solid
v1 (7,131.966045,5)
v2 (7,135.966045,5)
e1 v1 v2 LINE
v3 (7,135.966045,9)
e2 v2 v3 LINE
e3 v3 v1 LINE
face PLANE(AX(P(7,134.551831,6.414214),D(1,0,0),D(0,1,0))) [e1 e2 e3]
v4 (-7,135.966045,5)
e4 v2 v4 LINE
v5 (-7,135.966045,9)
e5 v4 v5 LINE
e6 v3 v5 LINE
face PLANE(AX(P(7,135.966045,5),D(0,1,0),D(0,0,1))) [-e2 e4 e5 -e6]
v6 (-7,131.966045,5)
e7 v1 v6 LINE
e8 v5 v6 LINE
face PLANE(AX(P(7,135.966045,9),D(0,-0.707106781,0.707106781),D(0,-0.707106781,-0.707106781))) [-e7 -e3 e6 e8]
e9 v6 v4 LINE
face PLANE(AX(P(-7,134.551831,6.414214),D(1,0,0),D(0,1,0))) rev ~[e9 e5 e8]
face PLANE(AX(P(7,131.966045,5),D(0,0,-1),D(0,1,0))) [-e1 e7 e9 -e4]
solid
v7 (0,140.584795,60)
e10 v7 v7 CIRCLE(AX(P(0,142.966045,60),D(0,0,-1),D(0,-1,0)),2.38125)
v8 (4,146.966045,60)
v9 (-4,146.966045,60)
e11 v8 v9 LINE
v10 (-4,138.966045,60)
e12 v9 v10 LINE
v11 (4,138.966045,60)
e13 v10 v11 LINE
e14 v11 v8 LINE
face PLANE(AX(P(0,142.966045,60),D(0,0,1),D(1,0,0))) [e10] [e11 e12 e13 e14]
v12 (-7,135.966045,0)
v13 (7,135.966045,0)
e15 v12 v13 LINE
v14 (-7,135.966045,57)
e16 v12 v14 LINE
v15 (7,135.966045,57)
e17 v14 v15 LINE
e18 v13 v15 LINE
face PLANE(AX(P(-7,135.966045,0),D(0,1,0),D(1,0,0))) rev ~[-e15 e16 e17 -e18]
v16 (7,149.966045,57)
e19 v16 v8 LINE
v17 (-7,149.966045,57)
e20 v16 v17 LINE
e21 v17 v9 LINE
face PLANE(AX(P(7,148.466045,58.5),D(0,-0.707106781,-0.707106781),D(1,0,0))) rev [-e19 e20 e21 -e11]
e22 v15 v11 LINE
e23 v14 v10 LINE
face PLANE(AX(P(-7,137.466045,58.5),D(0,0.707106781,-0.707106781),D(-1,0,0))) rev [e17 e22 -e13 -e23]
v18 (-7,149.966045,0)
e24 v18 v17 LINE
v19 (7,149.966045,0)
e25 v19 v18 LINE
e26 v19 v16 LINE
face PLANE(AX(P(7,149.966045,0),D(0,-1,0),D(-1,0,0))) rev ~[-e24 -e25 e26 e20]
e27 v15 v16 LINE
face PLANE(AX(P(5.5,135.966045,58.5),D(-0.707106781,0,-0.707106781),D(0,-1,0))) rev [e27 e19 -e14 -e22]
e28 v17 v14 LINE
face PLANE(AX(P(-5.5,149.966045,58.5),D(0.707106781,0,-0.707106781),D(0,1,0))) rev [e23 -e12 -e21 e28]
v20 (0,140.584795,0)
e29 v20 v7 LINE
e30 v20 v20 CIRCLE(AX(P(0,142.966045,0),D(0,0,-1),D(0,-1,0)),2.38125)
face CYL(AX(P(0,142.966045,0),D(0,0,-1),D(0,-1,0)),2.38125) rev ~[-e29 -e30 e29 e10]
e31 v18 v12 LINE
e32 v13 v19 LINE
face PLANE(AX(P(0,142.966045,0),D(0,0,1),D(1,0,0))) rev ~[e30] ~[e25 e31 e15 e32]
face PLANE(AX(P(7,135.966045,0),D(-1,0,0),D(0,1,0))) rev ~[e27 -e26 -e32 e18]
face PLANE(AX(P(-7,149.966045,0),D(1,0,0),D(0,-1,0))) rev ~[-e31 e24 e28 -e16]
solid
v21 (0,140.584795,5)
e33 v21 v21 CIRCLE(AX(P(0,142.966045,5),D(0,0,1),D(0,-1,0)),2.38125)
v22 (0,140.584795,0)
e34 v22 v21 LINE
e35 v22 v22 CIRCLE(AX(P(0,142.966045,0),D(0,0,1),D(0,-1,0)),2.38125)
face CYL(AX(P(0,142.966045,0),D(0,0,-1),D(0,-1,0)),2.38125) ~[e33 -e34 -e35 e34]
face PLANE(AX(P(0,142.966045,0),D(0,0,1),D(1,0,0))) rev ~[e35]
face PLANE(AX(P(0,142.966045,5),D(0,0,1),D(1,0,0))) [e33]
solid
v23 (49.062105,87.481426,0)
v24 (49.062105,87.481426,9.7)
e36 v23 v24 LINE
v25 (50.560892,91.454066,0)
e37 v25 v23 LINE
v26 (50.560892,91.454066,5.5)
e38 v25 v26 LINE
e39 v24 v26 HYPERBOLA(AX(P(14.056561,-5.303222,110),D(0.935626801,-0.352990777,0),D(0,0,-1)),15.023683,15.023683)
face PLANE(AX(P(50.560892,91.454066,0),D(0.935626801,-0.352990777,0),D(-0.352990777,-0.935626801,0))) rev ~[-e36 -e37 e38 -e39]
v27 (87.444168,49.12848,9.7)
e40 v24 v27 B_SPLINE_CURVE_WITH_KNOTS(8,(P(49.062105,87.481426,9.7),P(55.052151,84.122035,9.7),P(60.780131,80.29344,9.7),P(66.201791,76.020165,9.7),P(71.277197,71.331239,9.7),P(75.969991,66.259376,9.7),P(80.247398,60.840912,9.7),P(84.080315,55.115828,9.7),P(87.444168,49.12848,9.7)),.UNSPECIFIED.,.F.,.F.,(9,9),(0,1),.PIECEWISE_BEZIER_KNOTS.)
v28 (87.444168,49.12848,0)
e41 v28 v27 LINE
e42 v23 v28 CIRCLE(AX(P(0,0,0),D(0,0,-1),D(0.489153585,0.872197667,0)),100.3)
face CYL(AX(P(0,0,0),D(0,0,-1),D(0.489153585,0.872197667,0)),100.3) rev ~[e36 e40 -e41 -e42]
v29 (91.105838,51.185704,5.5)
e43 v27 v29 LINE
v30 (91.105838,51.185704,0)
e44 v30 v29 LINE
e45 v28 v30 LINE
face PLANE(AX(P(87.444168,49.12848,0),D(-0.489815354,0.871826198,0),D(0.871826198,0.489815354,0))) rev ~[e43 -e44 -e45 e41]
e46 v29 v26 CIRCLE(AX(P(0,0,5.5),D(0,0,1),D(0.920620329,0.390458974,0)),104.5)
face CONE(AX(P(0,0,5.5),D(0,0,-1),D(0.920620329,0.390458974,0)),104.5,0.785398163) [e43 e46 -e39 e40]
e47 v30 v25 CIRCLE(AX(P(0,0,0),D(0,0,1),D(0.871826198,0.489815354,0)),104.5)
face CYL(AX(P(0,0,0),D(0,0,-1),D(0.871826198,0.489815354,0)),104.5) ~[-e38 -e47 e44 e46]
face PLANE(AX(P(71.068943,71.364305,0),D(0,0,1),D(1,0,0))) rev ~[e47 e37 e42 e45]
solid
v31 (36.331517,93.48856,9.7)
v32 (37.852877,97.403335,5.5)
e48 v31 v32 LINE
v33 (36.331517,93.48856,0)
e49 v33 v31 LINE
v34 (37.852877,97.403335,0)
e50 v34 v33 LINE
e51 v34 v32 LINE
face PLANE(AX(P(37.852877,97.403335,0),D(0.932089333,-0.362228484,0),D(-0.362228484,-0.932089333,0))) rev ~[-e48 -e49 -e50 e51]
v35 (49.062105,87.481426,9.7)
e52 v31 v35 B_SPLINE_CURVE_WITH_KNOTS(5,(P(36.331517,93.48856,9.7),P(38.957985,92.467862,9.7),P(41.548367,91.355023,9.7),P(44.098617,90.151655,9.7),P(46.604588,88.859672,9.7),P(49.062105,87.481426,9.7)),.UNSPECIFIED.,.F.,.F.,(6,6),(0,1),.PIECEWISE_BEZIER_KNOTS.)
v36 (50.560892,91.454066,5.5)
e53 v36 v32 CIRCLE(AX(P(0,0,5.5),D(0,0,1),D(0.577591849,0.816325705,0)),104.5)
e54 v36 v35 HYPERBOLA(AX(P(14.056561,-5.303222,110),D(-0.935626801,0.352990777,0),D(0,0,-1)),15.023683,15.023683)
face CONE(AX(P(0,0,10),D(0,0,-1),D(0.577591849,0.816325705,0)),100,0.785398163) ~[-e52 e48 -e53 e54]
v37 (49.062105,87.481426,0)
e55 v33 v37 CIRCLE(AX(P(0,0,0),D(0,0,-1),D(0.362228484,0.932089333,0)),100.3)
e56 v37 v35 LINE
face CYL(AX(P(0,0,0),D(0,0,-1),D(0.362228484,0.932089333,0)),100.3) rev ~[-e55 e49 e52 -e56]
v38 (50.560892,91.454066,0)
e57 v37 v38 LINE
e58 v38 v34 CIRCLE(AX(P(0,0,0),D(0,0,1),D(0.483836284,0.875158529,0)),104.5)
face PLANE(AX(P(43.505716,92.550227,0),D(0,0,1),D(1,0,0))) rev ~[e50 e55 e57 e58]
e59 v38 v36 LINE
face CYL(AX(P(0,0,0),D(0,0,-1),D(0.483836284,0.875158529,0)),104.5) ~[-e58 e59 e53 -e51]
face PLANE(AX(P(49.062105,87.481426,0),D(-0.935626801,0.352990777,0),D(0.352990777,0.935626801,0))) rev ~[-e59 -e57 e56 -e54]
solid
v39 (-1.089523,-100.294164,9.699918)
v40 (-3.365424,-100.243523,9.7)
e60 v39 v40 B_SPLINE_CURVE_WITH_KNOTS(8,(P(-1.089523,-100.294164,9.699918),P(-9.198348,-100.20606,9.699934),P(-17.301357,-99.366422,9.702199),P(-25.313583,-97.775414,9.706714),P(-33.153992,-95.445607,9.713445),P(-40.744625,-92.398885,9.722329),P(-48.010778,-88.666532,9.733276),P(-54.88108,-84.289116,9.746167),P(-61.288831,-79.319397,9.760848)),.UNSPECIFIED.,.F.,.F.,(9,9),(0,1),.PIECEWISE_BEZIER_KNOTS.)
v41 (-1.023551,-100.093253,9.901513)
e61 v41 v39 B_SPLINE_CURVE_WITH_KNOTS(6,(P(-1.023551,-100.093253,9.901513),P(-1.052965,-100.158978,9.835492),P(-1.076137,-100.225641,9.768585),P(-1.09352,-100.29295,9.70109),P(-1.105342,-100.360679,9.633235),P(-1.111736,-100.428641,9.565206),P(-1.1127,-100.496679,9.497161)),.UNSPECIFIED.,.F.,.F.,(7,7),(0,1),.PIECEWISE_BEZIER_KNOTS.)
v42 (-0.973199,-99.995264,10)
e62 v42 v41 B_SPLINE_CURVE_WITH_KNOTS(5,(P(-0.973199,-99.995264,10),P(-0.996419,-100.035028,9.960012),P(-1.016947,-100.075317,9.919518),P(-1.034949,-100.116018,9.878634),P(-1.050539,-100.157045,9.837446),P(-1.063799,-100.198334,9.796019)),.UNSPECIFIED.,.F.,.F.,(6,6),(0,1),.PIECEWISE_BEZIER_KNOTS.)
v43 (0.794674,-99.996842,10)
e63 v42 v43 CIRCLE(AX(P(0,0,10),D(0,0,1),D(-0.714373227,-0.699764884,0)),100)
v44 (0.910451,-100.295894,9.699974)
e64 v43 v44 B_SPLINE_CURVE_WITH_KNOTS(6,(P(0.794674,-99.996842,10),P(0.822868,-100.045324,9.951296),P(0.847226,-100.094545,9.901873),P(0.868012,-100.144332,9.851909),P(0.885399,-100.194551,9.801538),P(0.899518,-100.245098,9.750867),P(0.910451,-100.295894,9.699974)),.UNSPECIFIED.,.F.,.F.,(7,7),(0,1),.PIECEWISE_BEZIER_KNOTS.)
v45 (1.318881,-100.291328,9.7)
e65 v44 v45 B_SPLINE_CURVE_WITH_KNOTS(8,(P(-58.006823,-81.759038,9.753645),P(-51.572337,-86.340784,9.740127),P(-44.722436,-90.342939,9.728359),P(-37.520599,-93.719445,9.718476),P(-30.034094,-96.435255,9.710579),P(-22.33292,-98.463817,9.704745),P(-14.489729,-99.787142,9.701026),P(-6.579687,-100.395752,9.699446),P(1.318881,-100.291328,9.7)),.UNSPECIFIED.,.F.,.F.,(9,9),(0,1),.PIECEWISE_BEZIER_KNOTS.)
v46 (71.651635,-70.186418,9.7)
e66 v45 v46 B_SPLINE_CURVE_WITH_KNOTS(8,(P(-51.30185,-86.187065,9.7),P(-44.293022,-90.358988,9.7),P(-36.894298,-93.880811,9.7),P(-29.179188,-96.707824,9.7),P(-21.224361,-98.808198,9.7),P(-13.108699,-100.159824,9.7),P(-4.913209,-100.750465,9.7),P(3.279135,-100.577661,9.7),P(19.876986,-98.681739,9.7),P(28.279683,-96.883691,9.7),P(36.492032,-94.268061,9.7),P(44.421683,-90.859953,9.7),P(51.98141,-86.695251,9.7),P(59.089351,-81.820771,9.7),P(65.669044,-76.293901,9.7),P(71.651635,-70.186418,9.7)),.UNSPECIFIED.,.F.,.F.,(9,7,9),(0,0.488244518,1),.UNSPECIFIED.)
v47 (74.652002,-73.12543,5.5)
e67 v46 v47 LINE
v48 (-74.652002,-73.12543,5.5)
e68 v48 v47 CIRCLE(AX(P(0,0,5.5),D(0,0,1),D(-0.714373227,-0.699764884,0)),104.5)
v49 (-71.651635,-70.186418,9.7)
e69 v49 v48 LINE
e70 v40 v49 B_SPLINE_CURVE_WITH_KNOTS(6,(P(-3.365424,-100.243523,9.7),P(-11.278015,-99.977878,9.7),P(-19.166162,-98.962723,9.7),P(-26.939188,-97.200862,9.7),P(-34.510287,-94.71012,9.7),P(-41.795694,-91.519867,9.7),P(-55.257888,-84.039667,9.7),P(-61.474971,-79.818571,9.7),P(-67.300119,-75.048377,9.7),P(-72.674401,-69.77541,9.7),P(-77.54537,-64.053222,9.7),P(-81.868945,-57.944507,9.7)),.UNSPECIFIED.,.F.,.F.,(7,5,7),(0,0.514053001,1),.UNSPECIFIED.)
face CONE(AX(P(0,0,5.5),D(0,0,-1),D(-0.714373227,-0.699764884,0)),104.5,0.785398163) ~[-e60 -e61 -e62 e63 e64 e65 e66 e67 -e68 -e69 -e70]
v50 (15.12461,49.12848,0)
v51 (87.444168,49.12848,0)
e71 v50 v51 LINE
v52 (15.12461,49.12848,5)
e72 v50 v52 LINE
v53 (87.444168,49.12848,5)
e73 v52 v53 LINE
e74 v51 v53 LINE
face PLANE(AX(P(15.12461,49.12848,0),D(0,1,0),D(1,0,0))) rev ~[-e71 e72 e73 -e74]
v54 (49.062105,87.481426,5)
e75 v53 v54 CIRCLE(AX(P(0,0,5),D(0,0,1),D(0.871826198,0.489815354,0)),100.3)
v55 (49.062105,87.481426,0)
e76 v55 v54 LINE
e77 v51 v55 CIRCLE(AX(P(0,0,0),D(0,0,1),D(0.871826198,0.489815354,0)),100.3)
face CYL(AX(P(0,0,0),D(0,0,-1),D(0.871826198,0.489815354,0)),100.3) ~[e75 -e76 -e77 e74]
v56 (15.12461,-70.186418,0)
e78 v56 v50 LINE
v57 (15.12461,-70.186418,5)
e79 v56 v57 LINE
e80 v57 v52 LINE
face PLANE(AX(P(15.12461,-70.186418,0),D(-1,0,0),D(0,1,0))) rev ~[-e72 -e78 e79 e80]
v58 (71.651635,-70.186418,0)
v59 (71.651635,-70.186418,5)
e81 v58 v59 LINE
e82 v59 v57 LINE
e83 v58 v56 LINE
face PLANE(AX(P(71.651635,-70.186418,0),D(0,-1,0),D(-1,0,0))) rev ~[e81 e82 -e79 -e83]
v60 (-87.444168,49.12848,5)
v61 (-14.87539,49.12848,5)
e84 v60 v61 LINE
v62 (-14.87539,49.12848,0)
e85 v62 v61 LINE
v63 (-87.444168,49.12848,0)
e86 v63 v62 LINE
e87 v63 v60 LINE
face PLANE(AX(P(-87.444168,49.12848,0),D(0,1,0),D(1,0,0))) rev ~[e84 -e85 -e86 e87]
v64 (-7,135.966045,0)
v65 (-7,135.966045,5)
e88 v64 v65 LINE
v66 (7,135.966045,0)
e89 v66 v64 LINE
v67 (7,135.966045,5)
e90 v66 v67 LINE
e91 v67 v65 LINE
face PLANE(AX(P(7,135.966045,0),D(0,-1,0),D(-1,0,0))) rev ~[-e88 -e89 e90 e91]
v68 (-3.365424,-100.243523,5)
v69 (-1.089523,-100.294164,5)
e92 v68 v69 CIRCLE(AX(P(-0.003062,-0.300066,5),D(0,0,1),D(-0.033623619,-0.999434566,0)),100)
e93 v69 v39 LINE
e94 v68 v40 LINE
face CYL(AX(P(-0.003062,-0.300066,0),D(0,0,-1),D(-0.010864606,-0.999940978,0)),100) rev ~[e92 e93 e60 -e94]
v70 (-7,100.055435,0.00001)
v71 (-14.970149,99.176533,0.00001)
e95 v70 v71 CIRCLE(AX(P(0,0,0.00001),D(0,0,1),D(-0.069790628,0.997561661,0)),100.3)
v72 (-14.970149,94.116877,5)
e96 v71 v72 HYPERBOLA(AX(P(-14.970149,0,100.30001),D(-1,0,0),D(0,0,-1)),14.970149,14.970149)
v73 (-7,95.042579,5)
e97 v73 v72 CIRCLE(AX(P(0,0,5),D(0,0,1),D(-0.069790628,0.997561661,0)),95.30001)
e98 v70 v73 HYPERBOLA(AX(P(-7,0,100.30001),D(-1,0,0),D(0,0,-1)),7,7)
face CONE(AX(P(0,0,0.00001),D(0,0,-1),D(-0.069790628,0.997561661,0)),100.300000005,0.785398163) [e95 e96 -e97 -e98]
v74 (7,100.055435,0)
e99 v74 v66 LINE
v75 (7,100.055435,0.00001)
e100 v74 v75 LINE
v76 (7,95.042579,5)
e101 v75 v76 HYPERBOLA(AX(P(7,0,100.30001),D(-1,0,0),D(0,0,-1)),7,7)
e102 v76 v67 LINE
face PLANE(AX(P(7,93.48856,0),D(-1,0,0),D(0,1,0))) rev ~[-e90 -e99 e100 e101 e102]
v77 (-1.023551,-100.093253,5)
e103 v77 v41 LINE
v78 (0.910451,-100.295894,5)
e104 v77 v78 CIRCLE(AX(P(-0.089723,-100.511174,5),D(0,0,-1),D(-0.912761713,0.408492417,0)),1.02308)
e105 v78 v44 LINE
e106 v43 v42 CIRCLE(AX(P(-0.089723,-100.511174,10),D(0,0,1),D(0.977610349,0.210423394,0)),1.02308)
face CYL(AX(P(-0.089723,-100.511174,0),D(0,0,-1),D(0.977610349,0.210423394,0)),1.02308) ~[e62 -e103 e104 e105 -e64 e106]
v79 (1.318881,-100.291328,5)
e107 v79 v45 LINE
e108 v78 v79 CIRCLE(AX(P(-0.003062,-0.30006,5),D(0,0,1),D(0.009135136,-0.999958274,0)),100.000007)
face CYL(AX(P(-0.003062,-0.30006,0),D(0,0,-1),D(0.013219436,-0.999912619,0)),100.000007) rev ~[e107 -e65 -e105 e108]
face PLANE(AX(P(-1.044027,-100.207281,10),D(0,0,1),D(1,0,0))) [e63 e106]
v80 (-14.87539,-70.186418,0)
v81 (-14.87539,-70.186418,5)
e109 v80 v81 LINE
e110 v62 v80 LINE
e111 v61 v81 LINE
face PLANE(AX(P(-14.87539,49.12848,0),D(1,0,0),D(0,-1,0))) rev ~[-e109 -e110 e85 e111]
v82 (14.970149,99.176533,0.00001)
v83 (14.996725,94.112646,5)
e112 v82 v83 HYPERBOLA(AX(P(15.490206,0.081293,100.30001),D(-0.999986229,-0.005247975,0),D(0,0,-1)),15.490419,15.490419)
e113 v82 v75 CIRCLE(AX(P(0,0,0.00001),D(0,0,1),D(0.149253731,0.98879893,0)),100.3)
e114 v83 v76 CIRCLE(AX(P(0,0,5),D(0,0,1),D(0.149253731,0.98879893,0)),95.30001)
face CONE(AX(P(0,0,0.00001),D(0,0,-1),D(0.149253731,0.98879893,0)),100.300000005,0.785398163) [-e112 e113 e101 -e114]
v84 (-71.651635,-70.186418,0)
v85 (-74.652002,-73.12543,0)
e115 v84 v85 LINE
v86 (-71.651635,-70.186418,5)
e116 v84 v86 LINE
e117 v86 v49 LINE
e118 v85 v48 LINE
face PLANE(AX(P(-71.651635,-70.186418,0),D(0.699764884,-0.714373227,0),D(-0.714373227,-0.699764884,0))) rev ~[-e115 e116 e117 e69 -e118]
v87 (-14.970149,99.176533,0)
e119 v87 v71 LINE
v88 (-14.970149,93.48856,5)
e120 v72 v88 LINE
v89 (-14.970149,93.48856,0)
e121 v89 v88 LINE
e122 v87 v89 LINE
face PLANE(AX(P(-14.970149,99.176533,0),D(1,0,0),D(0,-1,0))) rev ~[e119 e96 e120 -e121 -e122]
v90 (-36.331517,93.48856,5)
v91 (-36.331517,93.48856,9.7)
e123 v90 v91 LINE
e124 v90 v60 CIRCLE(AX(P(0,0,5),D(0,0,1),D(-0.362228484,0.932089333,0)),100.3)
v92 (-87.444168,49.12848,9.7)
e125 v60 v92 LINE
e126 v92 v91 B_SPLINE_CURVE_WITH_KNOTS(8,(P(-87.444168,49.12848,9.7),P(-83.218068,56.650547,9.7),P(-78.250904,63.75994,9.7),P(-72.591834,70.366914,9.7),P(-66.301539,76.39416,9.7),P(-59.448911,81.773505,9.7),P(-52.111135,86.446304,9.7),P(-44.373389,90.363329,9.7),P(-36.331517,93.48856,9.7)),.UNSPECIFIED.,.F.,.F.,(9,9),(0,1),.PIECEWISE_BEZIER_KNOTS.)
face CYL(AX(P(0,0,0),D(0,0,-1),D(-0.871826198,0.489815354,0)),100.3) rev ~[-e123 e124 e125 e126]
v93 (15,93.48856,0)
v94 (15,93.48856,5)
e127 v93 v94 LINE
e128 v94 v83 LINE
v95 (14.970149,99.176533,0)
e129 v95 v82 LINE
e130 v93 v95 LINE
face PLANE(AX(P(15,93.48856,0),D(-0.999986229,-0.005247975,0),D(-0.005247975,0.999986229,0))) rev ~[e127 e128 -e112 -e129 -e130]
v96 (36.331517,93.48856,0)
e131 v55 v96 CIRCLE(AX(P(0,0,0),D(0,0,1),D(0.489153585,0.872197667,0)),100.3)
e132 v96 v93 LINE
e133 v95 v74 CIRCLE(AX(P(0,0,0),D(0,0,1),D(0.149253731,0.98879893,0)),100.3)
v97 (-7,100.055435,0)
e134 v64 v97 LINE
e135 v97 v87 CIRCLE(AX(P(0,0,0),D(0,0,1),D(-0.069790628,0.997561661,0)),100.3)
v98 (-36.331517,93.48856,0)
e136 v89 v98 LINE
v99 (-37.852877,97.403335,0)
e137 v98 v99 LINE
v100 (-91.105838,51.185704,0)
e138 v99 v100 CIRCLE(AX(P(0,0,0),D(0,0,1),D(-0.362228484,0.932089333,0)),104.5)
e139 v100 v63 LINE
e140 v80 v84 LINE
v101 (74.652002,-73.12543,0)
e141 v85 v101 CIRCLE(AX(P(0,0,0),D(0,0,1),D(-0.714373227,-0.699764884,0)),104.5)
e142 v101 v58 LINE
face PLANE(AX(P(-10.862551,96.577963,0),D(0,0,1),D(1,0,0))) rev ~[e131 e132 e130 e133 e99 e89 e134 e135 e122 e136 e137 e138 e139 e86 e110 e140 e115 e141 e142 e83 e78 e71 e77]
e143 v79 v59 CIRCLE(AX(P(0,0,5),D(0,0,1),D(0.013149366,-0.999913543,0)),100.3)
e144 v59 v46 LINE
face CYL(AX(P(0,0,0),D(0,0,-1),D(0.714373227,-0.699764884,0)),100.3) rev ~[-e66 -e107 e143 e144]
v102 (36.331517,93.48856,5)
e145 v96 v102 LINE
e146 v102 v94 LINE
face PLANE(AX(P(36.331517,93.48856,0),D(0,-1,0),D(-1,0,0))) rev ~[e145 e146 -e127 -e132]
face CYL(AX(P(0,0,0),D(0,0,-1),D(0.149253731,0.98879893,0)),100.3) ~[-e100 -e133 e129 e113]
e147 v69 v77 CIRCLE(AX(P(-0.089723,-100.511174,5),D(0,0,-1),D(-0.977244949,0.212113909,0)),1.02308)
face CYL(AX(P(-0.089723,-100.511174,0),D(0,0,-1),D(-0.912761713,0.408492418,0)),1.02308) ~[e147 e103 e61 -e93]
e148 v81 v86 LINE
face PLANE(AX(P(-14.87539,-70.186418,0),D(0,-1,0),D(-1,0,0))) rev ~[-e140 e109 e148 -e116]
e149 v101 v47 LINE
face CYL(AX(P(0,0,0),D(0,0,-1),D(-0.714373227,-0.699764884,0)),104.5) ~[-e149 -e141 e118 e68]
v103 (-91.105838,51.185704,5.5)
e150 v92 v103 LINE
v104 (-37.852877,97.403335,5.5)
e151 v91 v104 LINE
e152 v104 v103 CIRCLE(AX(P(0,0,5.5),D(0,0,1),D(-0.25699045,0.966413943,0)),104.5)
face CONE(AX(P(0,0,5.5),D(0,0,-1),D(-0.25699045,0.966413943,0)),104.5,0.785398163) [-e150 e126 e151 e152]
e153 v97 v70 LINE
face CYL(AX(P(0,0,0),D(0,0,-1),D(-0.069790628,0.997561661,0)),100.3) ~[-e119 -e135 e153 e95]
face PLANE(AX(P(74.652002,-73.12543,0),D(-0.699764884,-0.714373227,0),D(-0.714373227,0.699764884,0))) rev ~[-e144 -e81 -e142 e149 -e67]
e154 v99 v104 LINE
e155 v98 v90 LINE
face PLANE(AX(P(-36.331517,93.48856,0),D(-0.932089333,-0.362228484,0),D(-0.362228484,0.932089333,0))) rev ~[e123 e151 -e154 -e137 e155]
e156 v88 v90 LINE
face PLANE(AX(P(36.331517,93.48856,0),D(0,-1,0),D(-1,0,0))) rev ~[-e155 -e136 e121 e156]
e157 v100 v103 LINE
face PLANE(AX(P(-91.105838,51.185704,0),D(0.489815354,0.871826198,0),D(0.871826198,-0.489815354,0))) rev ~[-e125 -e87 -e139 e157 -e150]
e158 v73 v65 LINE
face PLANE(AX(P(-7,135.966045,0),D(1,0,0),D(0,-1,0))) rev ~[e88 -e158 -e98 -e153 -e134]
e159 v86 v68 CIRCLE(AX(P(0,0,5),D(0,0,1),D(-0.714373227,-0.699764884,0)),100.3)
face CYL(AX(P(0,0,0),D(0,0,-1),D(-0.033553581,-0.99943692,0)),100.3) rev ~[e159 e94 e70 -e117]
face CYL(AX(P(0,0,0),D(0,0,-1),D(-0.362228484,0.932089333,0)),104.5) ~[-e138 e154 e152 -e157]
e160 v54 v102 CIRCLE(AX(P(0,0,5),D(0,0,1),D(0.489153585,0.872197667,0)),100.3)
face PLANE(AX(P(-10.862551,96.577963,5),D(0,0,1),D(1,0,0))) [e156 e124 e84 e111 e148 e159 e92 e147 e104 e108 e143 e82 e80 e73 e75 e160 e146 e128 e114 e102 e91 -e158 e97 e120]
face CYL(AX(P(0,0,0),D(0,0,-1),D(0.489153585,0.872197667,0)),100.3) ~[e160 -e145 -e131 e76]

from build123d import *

# Parameters (mm, degrees)
F1_DEPTH     = 5
F2_DEPTH     = 10
F3_DEPTH     = 10
F4_SIZE      = 4.5
F5_T2_ANGLE  = 52.1255505296
F6_DEPTH     = 10
F7_DEPTH     = 10
F8_T2_ANGLE  = 44.4260668477
F9_DEPTH     = 5
F10_DEPTH    = 5
F11_DEPTH    = 5
F12_DEPTH    = 60
F13_T2_ANGLE = 20.3893123961
F14_SIZE     = 4.99999
F15_SIZE     = 4.99999
F16_SIZE     = 3
F18_DEPTH    = 14


# Not quite as in the source:
# - a fillet or chamfer that OpenCascade refuses, or shapes differently, is made with other operations: its cross-section is extruded or revolved along the edge and cut away or added
# - a fillet or chamfer is up to 0.001 mm smaller than in the source, because OpenCascade refuses the exact size


with BuildPart() as f1:
    # F0 (on Top) → F1 (new body)
    with BuildSketch(Plane.XY):
        with BuildLine():
            Line((15.124610185, 49.1284800026), (87.4441676307, 49.1284800026))
            ThreePointArc((87.4441676307, 49.1284800026), (70.8958934178, 70.9497166767), (49.0621045575, 87.481426008))
            ThreePointArc((49.0621045575, 87.481426008), (42.8023254488, 90.7086045322), (36.3315169542, 93.4885601333))
            Line((36.3315169542, 93.4885601333), (15, 93.4885601333))
            Line((15, 93.4885601333), (7, 93.4885601333))
            Line((7, 93.4885601333), (0, 93.4885601333))
            Line((0, 93.4885601333), (-7, 93.4885601333))
            Line((-7, 93.4885601333), (-14.9701492537, 93.4885601333))
            Line((-14.9701492537, 93.4885601333), (-36.3315169542, 93.4885601333))
            ThreePointArc((-36.3315169542, 93.4885601333), (-65.7423699065, 75.7497907527), (-87.4441676307, 49.1284800026))
            Line((-87.4441676307, 49.1284800026), (-14.875389815, 49.1284800026))
            Line((-14.875389815, 49.1284800026), (-14.875389815, -70.1864178667))
            Line((-14.875389815, -70.1864178667), (-71.6516346432, -70.1864178667))
            ThreePointArc((-71.6516346432, -70.1864178667), (-40.4072663325, -91.8005600611), (-3.3654241895, -100.2435230827))
            ThreePointArc((-3.3654241895, -100.2435230827), (-2.227617662, -100.2753201611), (-1.0895229177, -100.2941642982))
            ThreePointArc((-1.0895229177, -100.2941642982), (-1.0617419835, -100.1919997221), (-1.0235513801, -100.0932532857))
            ThreePointArc((-1.0235513801, -100.0932532857), (0.0168897899, -99.4936635029), (0.9104513343, -100.2958938327))
            ThreePointArc((0.9104513343, -100.2958938327), (1.1146686841, -100.2938196477), (1.318881372, -100.2913283985))
            ThreePointArc((1.318881372, -100.2913283985), (39.4683475891, -92.2081316294), (71.6516346432, -70.1864178667))
            Line((71.6516346432, -70.1864178667), (15.124610185, -70.1864178667))
            Line((15.124610185, -70.1864178667), (15.124610185, 49.1284800026))
        make_face()
    extrude(amount=F1_DEPTH)

    # F0 (on Top) → F2 (join)
    with BuildSketch(Plane.XY):
        with BuildLine():
            ThreePointArc((-87.4441676307, 49.1284800026), (-65.7423699065, 75.7497907527), (-36.3315169542, 93.4885601333))
            Line((-36.3315169542, 93.4885601333), (-37.8528765874, 97.4033353333))
            ThreePointArc((-37.8528765874, 97.4033353333), (-68.4952906802, 78.9217660385), (-91.1058376611, 51.1857044893))
            Line((-91.1058376611, 51.1857044893), (-87.4441676307, 49.1284800026))
        make_face()
        with BuildLine():
            Line((74.6520021956, -73.1254303795), (71.6516346432, -70.1864178667))
            ThreePointArc((71.6516346432, -70.1864178667), (39.4683475891, -92.2081316294), (1.318881372, -100.2913283985))
            ThreePointArc((1.318881372, -100.2913283985), (1.1146686841, -100.2938196477), (0.9104513343, -100.2958938327))
            ThreePointArc((0.9104513343, -100.2958938327), (-0.0565525239, -100.3000521496), (-1.0235513801, -100.2948593303))
            ThreePointArc((-1.0235513801, -100.2948593303), (-1.0565372062, -100.2945172548), (-1.0895229177, -100.2941642982))
            ThreePointArc((-1.0895229177, -100.2941642982), (-2.227617662, -100.2753201611), (-3.3654241895, -100.2435230827))
            ThreePointArc((-3.3654241895, -100.2435230827), (-40.4072663325, -91.8005600611), (-71.6516346432, -70.1864178667))
            Line((-71.6516346432, -70.1864178667), (-74.6520021956, -73.1254303795))
            ThreePointArc((-74.6520021956, -73.1254303795), (0, -104.5), (74.6520021956, -73.1254303795))
        make_face()
    extrude(amount=F2_DEPTH)

    # F0 (on Top) → F3 (join)
    with BuildSketch(Plane.XY):
        with BuildLine():
            ThreePointArc((-1.0895229177, -100.2941642982), (-1.0565372062, -100.2945172548), (-1.0235513801, -100.2948593303))
            Line((-1.0235513801, -100.2948593303), (-1.0235513801, -100.0932532857))
            ThreePointArc((-1.0235513801, -100.0932532857), (-1.0617419835, -100.1919997221), (-1.0895229177, -100.2941642982))
        make_face()
        with BuildLine():
            ThreePointArc((-1.0235513801, -100.2948593303), (-0.0565525239, -100.3000521496), (0.9104513343, -100.2958938327))
            ThreePointArc((0.9104513343, -100.2958938327), (0.0168897899, -99.4936635029), (-1.0235513801, -100.0932532857))
            Line((-1.0235513801, -100.0932532857), (-1.0235513801, -100.2948593303))
        make_face()
    extrude(amount=F3_DEPTH)

    # F4
    f4_edges = [f1.edges().sort_by_distance(p)[0] for p in [
        (0, -104.5, 10),
    ]]
    chamfer(f4_edges, length=F4_SIZE)

    # F5: chamfer of 4.5 on 1 edges, made by hand

    # F5_s1 → F5_t2 (revolve, cut)
    with BuildSketch(Plane(origin=(0, 0, 0), x_dir=(0, 0, 1), z_dir=(0.9664139426, 0.2569904503, 0))):
        Polygon((5.5, -104.5), (10, -100), (10, -104.5), align=None)
    revolve(axis=Axis((0, 0, 10), (0, 0, 1)), revolution_arc=F5_T2_ANGLE, mode=Mode.SUBTRACT)

    # F0 (on Top) → F9 (join)
    with BuildSketch(Plane.XY):
        with BuildLine():
            Line((-7, 93.4885601333), (0, 93.4885601333))
            Line((0, 93.4885601333), (0, 100.3))
            ThreePointArc((0, 100.3), (-3.5021354992, 100.238840012), (-7, 100.055434635))
            Line((-7, 100.055434635), (-7, 93.4885601333))
        make_face()
        with BuildLine():
            Line((0, 93.4885601333), (7, 93.4885601333))
            Line((7, 93.4885601333), (7, 97.2463861108))
            Line((7, 97.2463861108), (7, 100.055434635))
            ThreePointArc((7, 100.055434635), (3.5021354992, 100.238840012), (0, 100.3))
            Line((0, 100.3), (0, 93.4885601333))
        make_face()
        with BuildLine():
            ThreePointArc((0, 100.3), (3.5021354992, 100.238840012), (7, 100.055434635))
            Line((7, 100.055434635), (7, 135.9660446667))
            Line((7, 135.9660446667), (0, 135.9660446667))
            Line((0, 135.9660446667), (-7, 135.9660446667))
            Line((-7, 135.9660446667), (-7, 100.055434635))
            ThreePointArc((-7, 100.055434635), (-3.5021354992, 100.238840012), (0, 100.3))
        make_face()
    extrude(amount=F9_DEPTH)

    # F0 (on Top) → F10 (join)
    with BuildSketch(Plane.XY):
        with BuildLine():
            Line((-14.9701492537, 93.4885601333), (-7, 93.4885601333))
            Line((-7, 93.4885601333), (-7, 100.055434635))
            ThreePointArc((-7, 100.055434635), (-10.9938610927, 99.6956619832), (-14.9701492537, 99.1765326643))
            Line((-14.9701492537, 99.1765326643), (-14.9701492537, 93.4885601333))
        make_face()
        with BuildLine():
            Line((7, 93.4885601333), (15, 93.4885601333))
            Line((15, 93.4885601333), (14.9701492537, 99.1765326643))
            ThreePointArc((14.9701492537, 99.1765326643), (10.9938610927, 99.6956619832), (7, 100.055434635))
            Line((7, 100.055434635), (7, 97.2463861108))
            Line((7, 97.2463861108), (7, 93.4885601333))
        make_face()
    extrude(amount=F10_DEPTH)

    # F14 (size 5 in the source; OpenCascade refuses exactly that, so slightly less here)
    f14_edges = [f1.edges().sort_by_distance(p)[0] for p in [
        (-10.993861, 99.695662, 5),
    ]]
    chamfer(f14_edges, length=F14_SIZE)

    # F15 (size 5 in the source; OpenCascade refuses exactly that, so slightly less here)
    f15_edges = [f1.edges().sort_by_distance(p)[0] for p in [
        (10.993861, 99.695662, 5),
    ]]
    chamfer(f15_edges, length=F15_SIZE)


with BuildPart() as f6:
    # F0 (on Top) → F6 (new body)
    with BuildSketch(Plane.XY):
        with BuildLine():
            ThreePointArc((36.3315169542, 93.4885601333), (42.8023254488, 90.7086045322), (49.0621045575, 87.481426008))
            Line((49.0621045575, 87.481426008), (50.5608916452, 91.454066263))
            ThreePointArc((50.5608916452, 91.454066263), (44.3068510943, 94.6422365866), (37.8528765874, 97.4033353333))
            Line((37.8528765874, 97.4033353333), (37.0921967708, 95.4459477333))
            Line((37.0921967708, 95.4459477333), (36.3315169542, 93.4885601333))
        make_face()
    extrude(amount=F6_DEPTH)

    # F13: chamfer of 4.5 on 1 edges, made by hand

    # F13_s1 → F13_t2 (revolve, cut)
    with BuildSketch(Plane(origin=(0, 0, 0), x_dir=(0, 0, 1), z_dir=(0.8163257049, -0.5775918485, 0))):
        Polygon((10, -100), (5.5, -104.5), (10, -104.5), align=None)
    revolve(axis=Axis((0, 0, 10), (0, 0, 1)), revolution_arc=F13_T2_ANGLE, mode=Mode.SUBTRACT)


with BuildPart() as f7:
    # F0 (on Top) → F7 (new body)
    with BuildSketch(Plane.XY):
        with BuildLine():
            ThreePointArc((49.0621045575, 87.481426008), (70.8958934178, 70.9497166767), (87.4441676307, 49.1284800026))
            Line((87.4441676307, 49.1284800026), (91.1058376611, 51.1857044893))
            ThreePointArc((91.1058376611, 51.1857044893), (73.6393290849, 74.1451226442), (50.5608916452, 91.454066263))
            Line((50.5608916452, 91.454066263), (49.0621045575, 87.481426008))
        make_face()
    extrude(amount=F7_DEPTH)

    # F8: chamfer of 4.5 on 1 edges, made by hand

    # F8_s1 → F8_t2 (revolve, cut)
    with BuildSketch(Plane(origin=(0, 0, 0), x_dir=(0, 0, 1), z_dir=(0.3904589739, -0.9206203287, 0))):
        Polygon((5.5, -104.5), (10, -100), (10, -104.5), align=None)
    revolve(axis=Axis((0, 0, 10), (0, 0, 1)), revolution_arc=F8_T2_ANGLE, mode=Mode.SUBTRACT)


with BuildPart() as f11:
    # F0 (on Top) → F11 (new body)
    with BuildSketch(Plane.XY):
        with BuildLine():
            ThreePointArc((2.38125, 142.9660446667), (-1.6837980227, 144.6498426894), (0, 140.5847946667))
            ThreePointArc((0, 140.5847946667), (1.6837980227, 141.282246644), (2.38125, 142.9660446667))
        make_face()
    extrude(amount=F11_DEPTH)


with BuildPart() as f12:
    # F0 (on Top) → F12 (new body)
    with BuildSketch(Plane.XY):
        Polygon((0, 135.9660446667), (7, 135.9660446667), (7, 149.9660446667), (-7, 149.9660446667), (-7, 135.9660446667), align=None)
        with BuildLine():
            ThreePointArc((2.38125, 142.9660446667), (1.6837980227, 141.282246644), (0, 140.5847946667))
            ThreePointArc((0, 140.5847946667), (-1.6837980227, 144.6498426894), (2.38125, 142.9660446667))
        make_face(mode=Mode.SUBTRACT)
    extrude(amount=F12_DEPTH)

    # F16
    f16_edges = [f12.edges().sort_by_distance(p)[0] for p in [
        (0, 135.966045, 60),
        (7, 142.966045, 60),
        (0, 149.966045, 60),
        (-7, 142.966045, 60),
    ]]
    chamfer(f16_edges, length=F16_SIZE)


with BuildPart() as f18:
    # F17 (on face) → F18 (new body)
    with BuildSketch(Plane.YZ.offset(7)):
        Polygon((131.9660446667, 5), (135.9660446667, 5), (135.9660446667, 9), align=None)
    extrude(amount=-F18_DEPTH)


solid = Compound([f1.part, f6.part, f7.part, f11.part, f12.part, f18.part])
